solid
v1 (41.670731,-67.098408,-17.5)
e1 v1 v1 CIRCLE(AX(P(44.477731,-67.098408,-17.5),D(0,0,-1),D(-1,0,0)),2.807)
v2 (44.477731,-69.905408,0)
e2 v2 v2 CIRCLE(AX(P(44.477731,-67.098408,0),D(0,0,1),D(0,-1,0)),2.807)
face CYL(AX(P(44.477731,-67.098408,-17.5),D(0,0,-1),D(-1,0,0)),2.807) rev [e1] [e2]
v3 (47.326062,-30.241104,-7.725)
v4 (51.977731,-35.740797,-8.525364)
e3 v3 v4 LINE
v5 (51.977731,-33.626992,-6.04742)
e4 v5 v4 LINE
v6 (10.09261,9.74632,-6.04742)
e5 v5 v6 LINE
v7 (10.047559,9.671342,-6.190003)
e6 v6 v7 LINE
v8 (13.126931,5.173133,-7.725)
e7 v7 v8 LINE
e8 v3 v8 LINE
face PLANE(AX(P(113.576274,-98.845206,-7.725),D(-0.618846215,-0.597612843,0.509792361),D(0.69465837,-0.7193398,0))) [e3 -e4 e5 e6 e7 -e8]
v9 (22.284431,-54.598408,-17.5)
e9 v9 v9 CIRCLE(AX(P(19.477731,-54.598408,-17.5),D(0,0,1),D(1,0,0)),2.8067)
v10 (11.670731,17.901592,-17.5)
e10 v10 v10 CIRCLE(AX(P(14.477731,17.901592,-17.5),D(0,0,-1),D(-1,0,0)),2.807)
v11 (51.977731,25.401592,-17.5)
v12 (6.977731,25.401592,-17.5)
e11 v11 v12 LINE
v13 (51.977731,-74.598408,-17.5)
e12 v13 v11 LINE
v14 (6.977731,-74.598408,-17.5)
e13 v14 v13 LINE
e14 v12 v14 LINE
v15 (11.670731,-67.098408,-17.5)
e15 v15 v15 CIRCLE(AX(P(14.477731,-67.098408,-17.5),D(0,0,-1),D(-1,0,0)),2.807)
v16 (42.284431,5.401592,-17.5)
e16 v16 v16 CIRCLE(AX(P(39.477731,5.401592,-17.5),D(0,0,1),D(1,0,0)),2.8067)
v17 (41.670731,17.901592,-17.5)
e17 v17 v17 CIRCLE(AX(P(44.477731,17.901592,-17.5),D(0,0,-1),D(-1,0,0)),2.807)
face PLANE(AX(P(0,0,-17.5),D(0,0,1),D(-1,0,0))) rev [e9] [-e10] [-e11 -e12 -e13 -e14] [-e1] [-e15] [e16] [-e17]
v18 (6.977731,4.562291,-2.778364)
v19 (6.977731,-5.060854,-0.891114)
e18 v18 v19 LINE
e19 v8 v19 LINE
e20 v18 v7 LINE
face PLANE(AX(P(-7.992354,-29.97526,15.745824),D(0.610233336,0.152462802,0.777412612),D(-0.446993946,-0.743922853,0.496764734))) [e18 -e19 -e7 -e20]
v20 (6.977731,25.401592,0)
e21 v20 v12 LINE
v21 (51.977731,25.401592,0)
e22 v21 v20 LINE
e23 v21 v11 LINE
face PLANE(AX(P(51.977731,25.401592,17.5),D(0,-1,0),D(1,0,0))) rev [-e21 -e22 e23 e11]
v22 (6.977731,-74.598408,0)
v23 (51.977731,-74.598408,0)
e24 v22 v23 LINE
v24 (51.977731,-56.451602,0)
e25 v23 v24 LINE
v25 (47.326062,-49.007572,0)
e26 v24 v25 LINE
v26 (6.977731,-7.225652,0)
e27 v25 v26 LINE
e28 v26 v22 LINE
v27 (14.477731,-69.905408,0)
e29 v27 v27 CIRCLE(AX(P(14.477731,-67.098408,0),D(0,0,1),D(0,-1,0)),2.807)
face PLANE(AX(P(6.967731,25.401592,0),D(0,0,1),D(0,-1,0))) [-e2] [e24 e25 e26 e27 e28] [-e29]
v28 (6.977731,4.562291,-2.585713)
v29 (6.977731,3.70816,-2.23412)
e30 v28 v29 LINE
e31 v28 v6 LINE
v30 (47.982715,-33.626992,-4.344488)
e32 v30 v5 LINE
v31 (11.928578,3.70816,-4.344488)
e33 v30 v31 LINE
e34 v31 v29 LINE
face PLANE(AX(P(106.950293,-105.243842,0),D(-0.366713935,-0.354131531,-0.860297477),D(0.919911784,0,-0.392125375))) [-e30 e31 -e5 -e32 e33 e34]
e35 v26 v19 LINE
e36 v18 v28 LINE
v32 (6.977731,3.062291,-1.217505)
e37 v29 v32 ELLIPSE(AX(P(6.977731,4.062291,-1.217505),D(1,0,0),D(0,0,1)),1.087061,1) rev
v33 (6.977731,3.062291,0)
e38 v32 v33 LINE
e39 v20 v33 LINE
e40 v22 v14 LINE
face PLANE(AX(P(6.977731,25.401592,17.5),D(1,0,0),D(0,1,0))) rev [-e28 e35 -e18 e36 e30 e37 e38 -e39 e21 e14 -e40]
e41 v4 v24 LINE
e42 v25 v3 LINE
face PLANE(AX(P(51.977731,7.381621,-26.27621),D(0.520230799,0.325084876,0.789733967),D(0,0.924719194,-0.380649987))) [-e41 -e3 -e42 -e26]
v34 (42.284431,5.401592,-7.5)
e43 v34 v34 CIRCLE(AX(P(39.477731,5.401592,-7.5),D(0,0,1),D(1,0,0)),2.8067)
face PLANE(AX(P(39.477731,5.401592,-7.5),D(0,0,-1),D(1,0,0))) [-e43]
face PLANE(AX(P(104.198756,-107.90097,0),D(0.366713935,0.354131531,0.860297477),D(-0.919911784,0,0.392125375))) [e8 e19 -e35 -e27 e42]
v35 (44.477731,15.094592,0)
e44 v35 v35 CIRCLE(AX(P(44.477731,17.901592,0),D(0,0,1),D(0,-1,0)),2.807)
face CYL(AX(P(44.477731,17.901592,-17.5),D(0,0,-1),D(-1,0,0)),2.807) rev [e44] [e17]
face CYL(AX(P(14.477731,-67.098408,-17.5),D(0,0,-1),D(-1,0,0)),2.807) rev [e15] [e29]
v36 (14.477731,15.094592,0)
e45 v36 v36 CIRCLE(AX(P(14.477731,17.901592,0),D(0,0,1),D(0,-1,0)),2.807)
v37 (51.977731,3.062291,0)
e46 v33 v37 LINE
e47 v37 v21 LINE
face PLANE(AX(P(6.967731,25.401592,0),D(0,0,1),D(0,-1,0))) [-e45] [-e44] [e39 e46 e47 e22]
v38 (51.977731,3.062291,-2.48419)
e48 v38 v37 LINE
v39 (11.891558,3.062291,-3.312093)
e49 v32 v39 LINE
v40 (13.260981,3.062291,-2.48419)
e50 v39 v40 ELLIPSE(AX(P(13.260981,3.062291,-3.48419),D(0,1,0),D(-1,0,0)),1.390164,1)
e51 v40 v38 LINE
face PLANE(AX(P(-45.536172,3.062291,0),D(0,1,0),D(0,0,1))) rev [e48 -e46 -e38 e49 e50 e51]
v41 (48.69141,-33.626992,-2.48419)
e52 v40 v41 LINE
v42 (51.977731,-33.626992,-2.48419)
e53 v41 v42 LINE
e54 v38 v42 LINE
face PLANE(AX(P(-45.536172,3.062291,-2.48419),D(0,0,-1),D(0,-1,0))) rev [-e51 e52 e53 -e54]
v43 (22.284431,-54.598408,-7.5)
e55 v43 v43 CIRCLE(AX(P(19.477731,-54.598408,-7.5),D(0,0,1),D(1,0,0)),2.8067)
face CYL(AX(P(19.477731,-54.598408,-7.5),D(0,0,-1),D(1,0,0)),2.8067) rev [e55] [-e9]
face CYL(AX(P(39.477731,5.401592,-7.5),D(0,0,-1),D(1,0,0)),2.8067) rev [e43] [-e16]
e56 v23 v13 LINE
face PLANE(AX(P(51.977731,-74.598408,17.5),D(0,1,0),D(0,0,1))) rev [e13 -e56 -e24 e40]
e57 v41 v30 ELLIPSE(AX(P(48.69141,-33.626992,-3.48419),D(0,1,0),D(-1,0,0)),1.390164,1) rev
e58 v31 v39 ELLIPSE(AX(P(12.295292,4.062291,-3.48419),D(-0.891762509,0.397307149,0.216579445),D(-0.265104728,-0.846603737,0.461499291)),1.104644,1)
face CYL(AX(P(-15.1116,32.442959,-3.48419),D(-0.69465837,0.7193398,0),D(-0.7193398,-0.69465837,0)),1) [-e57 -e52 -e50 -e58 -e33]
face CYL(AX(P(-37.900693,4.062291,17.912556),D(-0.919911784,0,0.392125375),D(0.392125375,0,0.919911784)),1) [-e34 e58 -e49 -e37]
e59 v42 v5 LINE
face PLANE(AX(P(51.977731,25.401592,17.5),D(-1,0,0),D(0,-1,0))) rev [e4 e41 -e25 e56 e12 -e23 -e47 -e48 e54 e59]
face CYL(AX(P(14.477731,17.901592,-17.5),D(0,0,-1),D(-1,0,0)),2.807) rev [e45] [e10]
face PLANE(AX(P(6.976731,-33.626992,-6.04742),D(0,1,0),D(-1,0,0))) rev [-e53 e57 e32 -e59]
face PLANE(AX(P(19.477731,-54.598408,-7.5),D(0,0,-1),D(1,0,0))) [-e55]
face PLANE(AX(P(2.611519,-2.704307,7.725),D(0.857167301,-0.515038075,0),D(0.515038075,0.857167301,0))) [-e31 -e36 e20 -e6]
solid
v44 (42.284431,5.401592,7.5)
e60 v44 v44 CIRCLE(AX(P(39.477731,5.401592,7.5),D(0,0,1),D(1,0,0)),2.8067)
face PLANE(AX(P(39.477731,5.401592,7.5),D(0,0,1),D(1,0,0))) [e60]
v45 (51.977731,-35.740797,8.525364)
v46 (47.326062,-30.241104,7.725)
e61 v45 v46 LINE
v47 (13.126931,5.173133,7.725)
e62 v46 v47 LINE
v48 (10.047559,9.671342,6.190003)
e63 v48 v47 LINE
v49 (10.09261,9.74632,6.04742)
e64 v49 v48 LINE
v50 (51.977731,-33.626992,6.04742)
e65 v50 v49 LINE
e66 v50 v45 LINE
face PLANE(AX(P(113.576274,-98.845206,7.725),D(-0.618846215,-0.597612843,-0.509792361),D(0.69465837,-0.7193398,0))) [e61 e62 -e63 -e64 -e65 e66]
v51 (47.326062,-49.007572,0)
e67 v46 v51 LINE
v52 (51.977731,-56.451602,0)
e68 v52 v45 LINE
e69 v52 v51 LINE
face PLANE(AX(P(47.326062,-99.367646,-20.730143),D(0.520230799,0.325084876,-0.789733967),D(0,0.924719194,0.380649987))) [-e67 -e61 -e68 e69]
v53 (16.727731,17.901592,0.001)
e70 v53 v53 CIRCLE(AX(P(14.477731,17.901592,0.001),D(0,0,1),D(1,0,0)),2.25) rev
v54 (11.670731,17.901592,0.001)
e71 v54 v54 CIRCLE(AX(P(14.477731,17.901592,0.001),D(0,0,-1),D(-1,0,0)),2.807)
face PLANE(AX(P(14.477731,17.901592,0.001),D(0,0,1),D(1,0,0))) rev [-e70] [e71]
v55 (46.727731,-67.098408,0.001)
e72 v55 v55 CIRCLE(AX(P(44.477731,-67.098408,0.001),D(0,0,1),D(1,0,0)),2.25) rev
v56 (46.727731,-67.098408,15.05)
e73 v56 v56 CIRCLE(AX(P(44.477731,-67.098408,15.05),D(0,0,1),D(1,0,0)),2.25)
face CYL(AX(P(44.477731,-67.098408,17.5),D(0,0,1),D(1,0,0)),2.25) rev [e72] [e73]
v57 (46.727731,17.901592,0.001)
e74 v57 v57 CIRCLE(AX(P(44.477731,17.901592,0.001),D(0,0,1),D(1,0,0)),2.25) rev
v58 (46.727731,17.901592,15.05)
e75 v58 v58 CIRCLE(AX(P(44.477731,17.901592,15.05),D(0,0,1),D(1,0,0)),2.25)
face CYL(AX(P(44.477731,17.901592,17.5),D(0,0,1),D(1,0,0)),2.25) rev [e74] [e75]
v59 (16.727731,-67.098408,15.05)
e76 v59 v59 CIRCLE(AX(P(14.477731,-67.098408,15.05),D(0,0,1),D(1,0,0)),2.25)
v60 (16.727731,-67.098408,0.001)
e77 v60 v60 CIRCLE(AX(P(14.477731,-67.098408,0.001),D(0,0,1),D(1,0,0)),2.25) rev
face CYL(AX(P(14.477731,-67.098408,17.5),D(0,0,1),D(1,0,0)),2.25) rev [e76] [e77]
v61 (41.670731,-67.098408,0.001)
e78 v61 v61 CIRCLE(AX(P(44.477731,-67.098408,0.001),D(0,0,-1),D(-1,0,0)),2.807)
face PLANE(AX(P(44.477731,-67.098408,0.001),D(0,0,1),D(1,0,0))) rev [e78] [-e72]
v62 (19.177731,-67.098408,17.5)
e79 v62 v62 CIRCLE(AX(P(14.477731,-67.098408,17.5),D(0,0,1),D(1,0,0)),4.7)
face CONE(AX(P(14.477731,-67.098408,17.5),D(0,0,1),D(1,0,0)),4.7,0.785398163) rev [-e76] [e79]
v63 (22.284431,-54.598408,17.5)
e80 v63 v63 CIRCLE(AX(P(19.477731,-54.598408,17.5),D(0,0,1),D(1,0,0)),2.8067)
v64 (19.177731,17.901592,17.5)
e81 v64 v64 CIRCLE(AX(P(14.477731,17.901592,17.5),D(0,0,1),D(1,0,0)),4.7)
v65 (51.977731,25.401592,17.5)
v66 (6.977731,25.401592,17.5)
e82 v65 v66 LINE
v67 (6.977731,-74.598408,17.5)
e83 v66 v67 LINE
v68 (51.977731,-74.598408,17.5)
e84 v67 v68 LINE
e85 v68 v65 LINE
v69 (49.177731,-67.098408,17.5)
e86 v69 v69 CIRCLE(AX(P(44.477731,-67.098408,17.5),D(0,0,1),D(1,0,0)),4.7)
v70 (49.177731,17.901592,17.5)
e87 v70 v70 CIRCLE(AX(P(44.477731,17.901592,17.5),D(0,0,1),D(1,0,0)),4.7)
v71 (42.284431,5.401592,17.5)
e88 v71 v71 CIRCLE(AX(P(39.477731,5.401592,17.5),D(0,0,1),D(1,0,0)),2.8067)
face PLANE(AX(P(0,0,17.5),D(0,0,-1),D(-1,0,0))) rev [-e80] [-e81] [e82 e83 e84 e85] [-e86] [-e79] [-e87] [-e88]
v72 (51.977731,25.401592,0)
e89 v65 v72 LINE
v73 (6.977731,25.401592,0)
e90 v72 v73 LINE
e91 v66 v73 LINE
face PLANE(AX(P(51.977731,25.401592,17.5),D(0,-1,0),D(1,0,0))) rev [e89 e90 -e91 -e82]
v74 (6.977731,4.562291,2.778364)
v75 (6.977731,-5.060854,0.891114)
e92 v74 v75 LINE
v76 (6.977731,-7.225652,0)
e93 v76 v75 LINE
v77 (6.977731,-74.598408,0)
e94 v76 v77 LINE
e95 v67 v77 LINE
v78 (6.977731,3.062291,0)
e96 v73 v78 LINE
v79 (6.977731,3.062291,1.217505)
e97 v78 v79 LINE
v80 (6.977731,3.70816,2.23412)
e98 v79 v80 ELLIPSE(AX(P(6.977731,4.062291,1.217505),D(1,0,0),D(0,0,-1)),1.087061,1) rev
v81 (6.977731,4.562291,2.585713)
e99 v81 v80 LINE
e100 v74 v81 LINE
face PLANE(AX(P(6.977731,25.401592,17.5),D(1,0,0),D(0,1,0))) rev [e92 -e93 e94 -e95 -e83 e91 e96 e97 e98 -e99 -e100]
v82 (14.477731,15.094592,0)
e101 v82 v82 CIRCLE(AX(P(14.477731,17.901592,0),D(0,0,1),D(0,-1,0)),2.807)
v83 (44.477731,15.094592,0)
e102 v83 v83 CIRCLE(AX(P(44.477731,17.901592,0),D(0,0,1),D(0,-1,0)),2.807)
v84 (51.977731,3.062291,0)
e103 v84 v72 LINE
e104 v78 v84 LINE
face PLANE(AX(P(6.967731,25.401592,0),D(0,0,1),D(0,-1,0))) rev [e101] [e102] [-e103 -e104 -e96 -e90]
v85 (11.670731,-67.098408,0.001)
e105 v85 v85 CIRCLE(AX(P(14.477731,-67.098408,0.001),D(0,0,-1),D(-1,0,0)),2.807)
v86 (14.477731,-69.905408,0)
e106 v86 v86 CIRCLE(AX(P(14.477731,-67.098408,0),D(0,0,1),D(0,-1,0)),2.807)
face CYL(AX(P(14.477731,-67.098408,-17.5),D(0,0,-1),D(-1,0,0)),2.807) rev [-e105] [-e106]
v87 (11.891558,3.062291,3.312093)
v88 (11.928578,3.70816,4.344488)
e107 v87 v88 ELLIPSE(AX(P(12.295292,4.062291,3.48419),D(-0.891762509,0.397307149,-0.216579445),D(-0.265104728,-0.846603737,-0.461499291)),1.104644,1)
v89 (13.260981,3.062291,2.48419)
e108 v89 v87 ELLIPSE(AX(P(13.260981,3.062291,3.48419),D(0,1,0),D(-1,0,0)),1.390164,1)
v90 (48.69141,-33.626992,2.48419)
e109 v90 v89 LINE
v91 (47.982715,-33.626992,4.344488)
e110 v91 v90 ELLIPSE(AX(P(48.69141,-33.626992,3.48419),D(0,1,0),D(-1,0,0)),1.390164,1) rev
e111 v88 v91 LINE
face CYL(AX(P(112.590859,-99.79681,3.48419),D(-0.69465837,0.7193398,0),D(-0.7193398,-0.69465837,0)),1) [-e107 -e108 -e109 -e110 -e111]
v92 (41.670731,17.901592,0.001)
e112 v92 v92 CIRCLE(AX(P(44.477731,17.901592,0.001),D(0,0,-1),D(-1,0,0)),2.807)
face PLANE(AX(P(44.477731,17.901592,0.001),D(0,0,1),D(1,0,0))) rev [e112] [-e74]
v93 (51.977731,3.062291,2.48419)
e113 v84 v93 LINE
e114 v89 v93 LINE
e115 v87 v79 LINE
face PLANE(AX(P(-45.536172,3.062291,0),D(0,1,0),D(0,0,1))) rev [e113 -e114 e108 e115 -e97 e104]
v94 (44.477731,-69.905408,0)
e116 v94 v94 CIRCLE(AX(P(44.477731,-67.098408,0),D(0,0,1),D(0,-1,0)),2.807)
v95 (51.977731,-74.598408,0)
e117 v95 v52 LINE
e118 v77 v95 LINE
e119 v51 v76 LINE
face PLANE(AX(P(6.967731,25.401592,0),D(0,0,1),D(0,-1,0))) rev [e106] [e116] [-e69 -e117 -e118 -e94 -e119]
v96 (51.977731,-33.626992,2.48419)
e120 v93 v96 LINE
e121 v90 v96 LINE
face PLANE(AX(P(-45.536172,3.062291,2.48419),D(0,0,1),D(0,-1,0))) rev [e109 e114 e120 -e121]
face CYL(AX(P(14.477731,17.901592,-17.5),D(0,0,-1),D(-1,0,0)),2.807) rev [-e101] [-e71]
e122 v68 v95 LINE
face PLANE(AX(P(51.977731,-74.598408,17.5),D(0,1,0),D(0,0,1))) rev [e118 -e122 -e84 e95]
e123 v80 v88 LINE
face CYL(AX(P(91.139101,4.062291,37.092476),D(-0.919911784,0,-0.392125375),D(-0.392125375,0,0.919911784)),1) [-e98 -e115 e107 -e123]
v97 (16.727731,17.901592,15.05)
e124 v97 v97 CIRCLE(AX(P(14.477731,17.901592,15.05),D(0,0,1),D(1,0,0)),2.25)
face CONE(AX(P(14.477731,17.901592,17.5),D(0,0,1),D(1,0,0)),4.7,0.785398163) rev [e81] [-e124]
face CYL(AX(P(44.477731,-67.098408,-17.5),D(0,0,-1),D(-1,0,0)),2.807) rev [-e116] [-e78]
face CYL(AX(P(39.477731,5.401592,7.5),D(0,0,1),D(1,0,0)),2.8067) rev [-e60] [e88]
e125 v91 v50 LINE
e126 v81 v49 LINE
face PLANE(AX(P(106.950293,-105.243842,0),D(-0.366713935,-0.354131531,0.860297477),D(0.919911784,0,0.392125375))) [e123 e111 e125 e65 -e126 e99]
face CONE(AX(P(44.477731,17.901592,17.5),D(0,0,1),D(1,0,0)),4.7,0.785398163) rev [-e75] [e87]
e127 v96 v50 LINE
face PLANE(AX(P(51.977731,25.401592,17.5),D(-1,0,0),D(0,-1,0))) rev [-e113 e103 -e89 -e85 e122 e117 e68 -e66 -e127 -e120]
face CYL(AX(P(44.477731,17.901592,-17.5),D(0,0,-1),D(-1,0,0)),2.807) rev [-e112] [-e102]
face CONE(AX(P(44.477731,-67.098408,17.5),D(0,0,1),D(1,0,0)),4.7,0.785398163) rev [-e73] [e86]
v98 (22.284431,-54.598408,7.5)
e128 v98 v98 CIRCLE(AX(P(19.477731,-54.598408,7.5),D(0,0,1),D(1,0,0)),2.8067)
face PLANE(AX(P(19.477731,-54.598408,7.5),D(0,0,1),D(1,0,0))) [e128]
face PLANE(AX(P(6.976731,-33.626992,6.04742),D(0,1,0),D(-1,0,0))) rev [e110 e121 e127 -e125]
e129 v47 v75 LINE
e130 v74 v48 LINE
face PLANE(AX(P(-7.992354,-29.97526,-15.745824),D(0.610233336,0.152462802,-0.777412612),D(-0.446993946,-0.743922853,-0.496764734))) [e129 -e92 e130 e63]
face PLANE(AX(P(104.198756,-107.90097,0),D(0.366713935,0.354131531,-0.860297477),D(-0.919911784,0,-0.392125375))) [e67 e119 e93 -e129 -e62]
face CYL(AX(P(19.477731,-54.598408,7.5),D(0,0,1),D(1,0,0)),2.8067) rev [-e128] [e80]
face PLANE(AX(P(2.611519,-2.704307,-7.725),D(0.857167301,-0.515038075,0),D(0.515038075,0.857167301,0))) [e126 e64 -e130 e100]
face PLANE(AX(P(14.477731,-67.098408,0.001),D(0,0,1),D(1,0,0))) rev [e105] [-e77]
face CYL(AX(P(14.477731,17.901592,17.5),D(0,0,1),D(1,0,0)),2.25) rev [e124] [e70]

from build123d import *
from OCP.BRepFilletAPI import BRepFilletAPI_MakeChamfer

# Parameters (mm, degrees)
BOSS_V_BLADE_PROFILE_DEPTH                     = 150
CUT_BLADE_TIP_CHAMFER_DEPTH                    = 158.368393375
CUT_BLADE_TIP_CHAMFER_DEPTH_BACK               = 158.368393375
CHAMFER1_SIZE                                  = 1.8
CHAMFER1_SIZE2                                 = 5
FILLET1_R                                      = 15
SKETCH5_W                                      = 45
SKETCH5_H                                      = 100
BOSS_EXTRUDE_MAIN_BODY_DEPTH                   = 17.5
SKETCH7_W                                      = 45
SKETCH7_H                                      = 100
CUT_EXTRUDE_SPLIT_HALF_DEPTH                   = 93.589723794
CUT_EXTRUDE13_TRIANGLE_REACH                   = 90.86
CUT_EXTRUDE15_COMPLETE_ARROW_WITH_DRAFT_REACH  = 90.86
SKETCH23_R                                     = 2.8067
CUT_EXTRUDE12_THREADED_INSERTS_DEPTH           = 10
CHAMFER4_SIZE                                  = 5
CHAMFER4_SIZE2                                 = 1
FILLET2_R                                      = 1
SPLIT1_SURFACE_1_BACK                          = 116.109
SPLIT1_SURFACE_1_DEPTH                         = 232.218
SPLIT1_SURFACE_2_BACK                          = 116.109
SPLIT1_SURFACE_2_DEPTH                         = 232.218
CSK_FOR_M4_FLAT_HEAD_MACHINE_SCREW1_AT_2_COUNT = 2
CSK_FOR_M4_FLAT_HEAD_MACHINE_SCREW1_AT_2_PITCH = 30
CSK_FOR_M4_FLAT_HEAD_MACHINE_SCREW1_AT_3_COUNT = 2
CSK_FOR_M4_FLAT_HEAD_MACHINE_SCREW1_AT_3_PITCH = 85
CSK_FOR_M4_FLAT_HEAD_MACHINE_SCREW1_AT_4_COUNT = 2
CSK_FOR_M4_FLAT_HEAD_MACHINE_SCREW1_AT_4_PITCH = 90.138781887
F_1_0MM_START                                  = -17.5
F_1_0MM_DOWEL_HOLE1_OUTLINE_R                  = 2.807
F_1_0MM_DOWEL_HOLE1_DEPTH                      = 17.501


# Read off the part's stored shape, not the designer's step: Ø1.0mm Dowel Hole1
with BuildPart() as part:
    # Sketch3 → Boss-v blade profile (new body)
    with BuildSketch(Plane(origin=(0, 0, 0), x_dir=(0.7193398003386497, 0.6946583704589988, 0), z_dir=(0.6946583704589988, -0.7193398003386497, 0))):
        Polygon((13.036284021, -7.725), (0, 0), (13.036284021, 7.725), (14.030379125, 6.04741992), (3.82508674, 0), (14.030379125, -6.04741992), align=None)
    extrude(amount=BOSS_V_BLADE_PROFILE_DEPTH)

    # Sketch4 → Cut-blade tip chamfer (cut, two sides: drawn at the far end of the back side and taken through both)
    with BuildSketch(Plane.XY.offset(-CUT_BLADE_TIP_CHAMFER_DEPTH_BACK)):
        Polygon((10.092610118, 9.7463203), (0, 0), (2.611518653, -2.704306731), align=None)
    extrude(amount=CUT_BLADE_TIP_CHAMFER_DEPTH + CUT_BLADE_TIP_CHAMFER_DEPTH_BACK, mode=Mode.SUBTRACT)

    # Chamfer1
    chamfer1_edges = [part.edges().sort_by_distance(p)[0] for p in [
        (6.087035325, 3.079924357, -3.8625),
        (6.087035325, 3.079924357, 3.8625),
    ]]
    chamfer1_side = [part.faces().sort_by_distance(p)[0] for p in [
        (6.141291032, 3.170221016, -3.678457706),
    ]]
    chamfer(chamfer1_edges, length=CHAMFER1_SIZE, length2=CHAMFER1_SIZE2, reference=chamfer1_side[0])

    # Fillet1
    # the kernel refuses this fillet: 15 mm, written as the material it takes off along each edge
    with BuildSketch(Plane(origin=(128.043138255, -84.874717349, 26.213735463), x_dir=(-0.6188462152488227, -0.5976128433976327, 0.5097923609455172), z_dir=(-0.3667139351367172, -0.3541315307268587, -0.8602974768773856)), Plane(origin=(99.824500946, -112.125138638, 39.986155383), x_dir=(-0.6188462152488224, -0.5976128433976324, -0.5097923609455178), z_dir=(0.3667139351367176, 0.3541315307268591, -0.8602974768773851))) as fillet1_piece_1:
        with BuildLine():
            CenterArc((FILLET1_R, FILLET1_R), FILLET1_R, 180, 90)
            Line((0, FILLET1_R), (0, 0))
            Line((0, 0), (FILLET1_R, 0))
        make_face()
    extrude(amount=76.95, mode=Mode.SUBTRACT)


with BuildPart() as body_2:
    # Sketch5 → Boss-Extrude-main body (new, symmetric)
    with BuildSketch(Plane.XY):
        with Locations((29.477731109, -24.598407631)):
            Rectangle(SKETCH5_W, SKETCH5_H)
    extrude(amount=BOSS_EXTRUDE_MAIN_BODY_DEPTH, both=True)

    # Combine1: cut part
    add(part.part, mode=Mode.SUBTRACT)

    # Sketch7 → Cut-Extrude-split half (cut, through all)
    with BuildSketch(Plane.XY):
        with Locations((29.477731109, -24.598407631)):
            Rectangle(SKETCH7_W, SKETCH7_H)
    extrude(amount=-CUT_EXTRUDE_SPLIT_HALF_DEPTH, mode=Mode.SUBTRACT)

    # Sketch24 → Cut-Extrude13-triangle (cut, up to next)
    with BuildSketch(Plane(origin=(51.977731109, 0, 0), x_dir=(0, 0, -1), z_dir=(1, 0, 0)), mode=Mode.PRIVATE) as cut_extrude13_triangle_sk1:
        Polygon((-6.04741992, -33.626992184), (0, -33.626992184), (0, -48.318087575), align=None)
    cut_extrude13_triangle_tool1 = extrude(cut_extrude13_triangle_sk1.sketch, amount=-CUT_EXTRUDE13_TRIANGLE_REACH, mode=Mode.PRIVATE) & body_2.part
    add(cut_extrude13_triangle_tool1.solids().sort_by_distance((51.977731, -38.524024, 2.015807))[0], mode=Mode.SUBTRACT)

    # Cut-Extrude15-complete arrow with draft: up to this plane
    cut_extrude15_complete_arrow_with_draft_end = Plane(origin=(106.950292701, -105.243841529, 0), z_dir=(-0.36671393513671685, -0.3541315307268584, 0.8602974768773857))
    # Sketch25 → Cut-Extrude15-complete arrow with draft (cut, up to the surface)
    with BuildSketch(Plane(origin=(51.977731109, 0, 0), x_dir=(0, 0, -1), z_dir=(1, 0, 0)), mode=Mode.PRIVATE) as cut_extrude15_complete_arrow_with_draft_sk1:
        Polygon((-2.484190366, 3.062291075), (-2.484190366, -33.626992184), (-0.561386507, -33.626992184), (0, -33.626992184), (0, 3.062291075), align=None)
    cut_extrude15_complete_arrow_with_draft_tool1 = split(extrude(cut_extrude15_complete_arrow_with_draft_sk1.sketch, amount=-CUT_EXTRUDE15_COMPLETE_ARROW_WITH_DRAFT_REACH, mode=Mode.PRIVATE), bisect_by=cut_extrude15_complete_arrow_with_draft_end, keep=Keep.BOTH, mode=Mode.PRIVATE)
    add(cut_extrude15_complete_arrow_with_draft_tool1.solids().sort_by_distance((51.977731, -15.282351, 1.242095))[0], mode=Mode.SUBTRACT)

    # Sketch23 → Cut-Extrude12-threaded inserts (cut)
    with BuildSketch(Plane.XY.offset(17.5)):
        with Locations((39.477731109, 5.401592369)):
            Circle(SKETCH23_R)
        with Locations((19.477731109, -54.598407631)):
            Circle(SKETCH23_R)
    extrude(amount=-CUT_EXTRUDE12_THREADED_INSERTS_DEPTH, mode=Mode.SUBTRACT)

    # Mirror1: body 2 across plane


with BuildPart() as body_2_1:
    add(body_2.part)
    add(body_2.part.mirror(Plane.XY))

    # Chamfer4: one chamfer whose edges measure the first distance from different faces: ONE call of the kernel's chamfer builder (chamfer() names one face for all edges)
    chamfer4_edges_1 = [body_2_1.edges().sort_by_distance(p)[0] for p in [
        (51.977731109, -44.441282249, -3.8625),
    ]]
    chamfer4_side_1 = [body_2_1.faces().sort_by_distance(p)[0] for p in [
        (30.79332274, -22.751818401, -3.760564651),
    ]]
    chamfer4_edges_2 = [body_2_1.edges().sort_by_distance(p)[0] for p in [
        (51.977731109, -44.441282249, 3.8625),
    ]]
    chamfer4_side_2 = [body_2_1.faces().sort_by_distance(p)[0] for p in [
        (30.79332274, -22.751818401, 3.760564651),
    ]]
    chamfer4 = BRepFilletAPI_MakeChamfer(body_2_1.part.solid().wrapped)
    for e in chamfer4_edges_1:
        chamfer4.Add(CHAMFER4_SIZE, CHAMFER4_SIZE2, e.wrapped, chamfer4_side_1[0].wrapped)  # the first distance lies on this face
    for e in chamfer4_edges_2:
        chamfer4.Add(CHAMFER4_SIZE, CHAMFER4_SIZE2, e.wrapped, chamfer4_side_2[0].wrapped)  # the first distance lies on this face
    add(Compound.cast(chamfer4.Shape()), mode=Mode.REPLACE)

    # Fillet2
    fillet2_edges = [body_2_1.edges().sort_by_distance(p)[0] for p in [
        (7.582913517, 3.062291075, 2.226222828),
        (25.903310424, -15.282350554, 2.484190366),
        (7.582913517, 3.062291075, -2.226222828),
        (25.903310424, -15.282350554, -2.484190366),
    ]]
    fillet(fillet2_edges, radius=FILLET2_R)


with BuildPart() as body_2_2:
    # Split1: the piece behind the surface
    add(body_2_1.part)
    # Split1 surface: a surface, the sketch's curves swept straight by 232.218 mm
    with BuildLine(Plane(origin=(51.977731109, 0, 0), x_dir=(0, 0, -1), z_dir=(1, 0, 0)).offset(-SPLIT1_SURFACE_1_BACK), mode=Mode.PRIVATE) as split1_surface_1_path:
        Line((0, 25.401592369), (0, -74.598407631))
    split1_surface_1 = Shell.extrude(split1_surface_1_path.wire(), (1 * SPLIT1_SURFACE_1_DEPTH, 0 * SPLIT1_SURFACE_1_DEPTH, 0 * SPLIT1_SURFACE_1_DEPTH))
    split(bisect_by=split1_surface_1, keep=Keep.BOTTOM)

    # Sketch31 → CSK for M4 Flat Head Machine Screw1 (revolve, cut)
    with BuildSketch(Plane(origin=(14.477731109, 17.901592369, 17.5), x_dir=(0, -1, 0), z_dir=(1, 0, 0))):
        Polygon((0, 0), (0, 17.5), (2.25, 17.5), (2.25, 2.45), (4.7, 0), align=None)
    csk_for_m4_flat_head_machine_screw1 = revolve(axis=Axis((14.477731109, 17.901592369, 23.85), (0, 0, -1)), mode=Mode.SUBTRACT)

    # CSK for M4 Flat Head Machine Screw1 at 2: CSK for M4 Flat Head Machine Screw1 ×2
    with Locations(*[(i * CSK_FOR_M4_FLAT_HEAD_MACHINE_SCREW1_AT_2_PITCH, 0, 0) for i in range(1, CSK_FOR_M4_FLAT_HEAD_MACHINE_SCREW1_AT_2_COUNT)]):
        add(csk_for_m4_flat_head_machine_screw1, mode=Mode.SUBTRACT)

    # CSK for M4 Flat Head Machine Screw1 at 3: CSK for M4 Flat Head Machine Screw1 ×2
    with Locations(*[(0, -i * CSK_FOR_M4_FLAT_HEAD_MACHINE_SCREW1_AT_3_PITCH, 0) for i in range(1, CSK_FOR_M4_FLAT_HEAD_MACHINE_SCREW1_AT_3_COUNT)]):
        add(csk_for_m4_flat_head_machine_screw1, mode=Mode.SUBTRACT)

    # CSK for M4 Flat Head Machine Screw1 at 4: CSK for M4 Flat Head Machine Screw1 ×2
    with Locations(*[Vector(0.33282011773513764, -0.9429903335828895, 0) * (i * CSK_FOR_M4_FLAT_HEAD_MACHINE_SCREW1_AT_4_PITCH) for i in range(1, CSK_FOR_M4_FLAT_HEAD_MACHINE_SCREW1_AT_4_COUNT)]):
        add(csk_for_m4_flat_head_machine_screw1, mode=Mode.SUBTRACT)


with BuildPart() as body_2_3:
    add(body_2_1.part)

    # Split1: split by a surface, the side it looks to stays
    # Split1 surface: a surface, the sketch's curves swept straight by 232.218 mm
    with BuildLine(Plane(origin=(51.977731109, 0, 0), x_dir=(0, 0, -1), z_dir=(1, 0, 0)).offset(-SPLIT1_SURFACE_2_BACK), mode=Mode.PRIVATE) as split1_surface_2_path:
        Line((0, 25.401592369), (0, -74.598407631))
    split1_surface_2 = Shell.extrude(split1_surface_2_path.wire(), (1 * SPLIT1_SURFACE_2_DEPTH, 0 * SPLIT1_SURFACE_2_DEPTH, 0 * SPLIT1_SURFACE_2_DEPTH))
    split(bisect_by=split1_surface_2, keep=Keep.TOP)


with BuildPart() as f_1_0mm_dowel_hole1_tool:
    # Ø1.0mm Dowel Hole1 outline → Ø1.0mm Dowel Hole1 (new body)
    with BuildSketch(Plane.XY.offset(F_1_0MM_START)):
        with Locations((44.477731109, 17.901592369)):
            Circle(F_1_0MM_DOWEL_HOLE1_OUTLINE_R)
        with Locations((14.477731109, 17.901592369)):
            Circle(F_1_0MM_DOWEL_HOLE1_OUTLINE_R)
        with Locations((14.477731109, -67.098407631)):
            Circle(F_1_0MM_DOWEL_HOLE1_OUTLINE_R)
        with Locations((44.477731109, -67.098407631)):
            Circle(F_1_0MM_DOWEL_HOLE1_OUTLINE_R)
    extrude(amount=F_1_0MM_DOWEL_HOLE1_DEPTH)


with BuildPart() as body_2_4:
    add(body_2_3.part)

    # Ø1.0mm Dowel Hole1: cut by f_1_0mm_dowel_hole1_tool
    add(f_1_0mm_dowel_hole1_tool.part, mode=Mode.SUBTRACT)


with BuildPart() as body_2_2_1:
    add(body_2_2.part)

    # Ø1.0mm Dowel Hole1: cut by f_1_0mm_dowel_hole1_tool
    add(f_1_0mm_dowel_hole1_tool.part, mode=Mode.SUBTRACT)


solid = Compound([body_2_4.part, body_2_2_1.part])
